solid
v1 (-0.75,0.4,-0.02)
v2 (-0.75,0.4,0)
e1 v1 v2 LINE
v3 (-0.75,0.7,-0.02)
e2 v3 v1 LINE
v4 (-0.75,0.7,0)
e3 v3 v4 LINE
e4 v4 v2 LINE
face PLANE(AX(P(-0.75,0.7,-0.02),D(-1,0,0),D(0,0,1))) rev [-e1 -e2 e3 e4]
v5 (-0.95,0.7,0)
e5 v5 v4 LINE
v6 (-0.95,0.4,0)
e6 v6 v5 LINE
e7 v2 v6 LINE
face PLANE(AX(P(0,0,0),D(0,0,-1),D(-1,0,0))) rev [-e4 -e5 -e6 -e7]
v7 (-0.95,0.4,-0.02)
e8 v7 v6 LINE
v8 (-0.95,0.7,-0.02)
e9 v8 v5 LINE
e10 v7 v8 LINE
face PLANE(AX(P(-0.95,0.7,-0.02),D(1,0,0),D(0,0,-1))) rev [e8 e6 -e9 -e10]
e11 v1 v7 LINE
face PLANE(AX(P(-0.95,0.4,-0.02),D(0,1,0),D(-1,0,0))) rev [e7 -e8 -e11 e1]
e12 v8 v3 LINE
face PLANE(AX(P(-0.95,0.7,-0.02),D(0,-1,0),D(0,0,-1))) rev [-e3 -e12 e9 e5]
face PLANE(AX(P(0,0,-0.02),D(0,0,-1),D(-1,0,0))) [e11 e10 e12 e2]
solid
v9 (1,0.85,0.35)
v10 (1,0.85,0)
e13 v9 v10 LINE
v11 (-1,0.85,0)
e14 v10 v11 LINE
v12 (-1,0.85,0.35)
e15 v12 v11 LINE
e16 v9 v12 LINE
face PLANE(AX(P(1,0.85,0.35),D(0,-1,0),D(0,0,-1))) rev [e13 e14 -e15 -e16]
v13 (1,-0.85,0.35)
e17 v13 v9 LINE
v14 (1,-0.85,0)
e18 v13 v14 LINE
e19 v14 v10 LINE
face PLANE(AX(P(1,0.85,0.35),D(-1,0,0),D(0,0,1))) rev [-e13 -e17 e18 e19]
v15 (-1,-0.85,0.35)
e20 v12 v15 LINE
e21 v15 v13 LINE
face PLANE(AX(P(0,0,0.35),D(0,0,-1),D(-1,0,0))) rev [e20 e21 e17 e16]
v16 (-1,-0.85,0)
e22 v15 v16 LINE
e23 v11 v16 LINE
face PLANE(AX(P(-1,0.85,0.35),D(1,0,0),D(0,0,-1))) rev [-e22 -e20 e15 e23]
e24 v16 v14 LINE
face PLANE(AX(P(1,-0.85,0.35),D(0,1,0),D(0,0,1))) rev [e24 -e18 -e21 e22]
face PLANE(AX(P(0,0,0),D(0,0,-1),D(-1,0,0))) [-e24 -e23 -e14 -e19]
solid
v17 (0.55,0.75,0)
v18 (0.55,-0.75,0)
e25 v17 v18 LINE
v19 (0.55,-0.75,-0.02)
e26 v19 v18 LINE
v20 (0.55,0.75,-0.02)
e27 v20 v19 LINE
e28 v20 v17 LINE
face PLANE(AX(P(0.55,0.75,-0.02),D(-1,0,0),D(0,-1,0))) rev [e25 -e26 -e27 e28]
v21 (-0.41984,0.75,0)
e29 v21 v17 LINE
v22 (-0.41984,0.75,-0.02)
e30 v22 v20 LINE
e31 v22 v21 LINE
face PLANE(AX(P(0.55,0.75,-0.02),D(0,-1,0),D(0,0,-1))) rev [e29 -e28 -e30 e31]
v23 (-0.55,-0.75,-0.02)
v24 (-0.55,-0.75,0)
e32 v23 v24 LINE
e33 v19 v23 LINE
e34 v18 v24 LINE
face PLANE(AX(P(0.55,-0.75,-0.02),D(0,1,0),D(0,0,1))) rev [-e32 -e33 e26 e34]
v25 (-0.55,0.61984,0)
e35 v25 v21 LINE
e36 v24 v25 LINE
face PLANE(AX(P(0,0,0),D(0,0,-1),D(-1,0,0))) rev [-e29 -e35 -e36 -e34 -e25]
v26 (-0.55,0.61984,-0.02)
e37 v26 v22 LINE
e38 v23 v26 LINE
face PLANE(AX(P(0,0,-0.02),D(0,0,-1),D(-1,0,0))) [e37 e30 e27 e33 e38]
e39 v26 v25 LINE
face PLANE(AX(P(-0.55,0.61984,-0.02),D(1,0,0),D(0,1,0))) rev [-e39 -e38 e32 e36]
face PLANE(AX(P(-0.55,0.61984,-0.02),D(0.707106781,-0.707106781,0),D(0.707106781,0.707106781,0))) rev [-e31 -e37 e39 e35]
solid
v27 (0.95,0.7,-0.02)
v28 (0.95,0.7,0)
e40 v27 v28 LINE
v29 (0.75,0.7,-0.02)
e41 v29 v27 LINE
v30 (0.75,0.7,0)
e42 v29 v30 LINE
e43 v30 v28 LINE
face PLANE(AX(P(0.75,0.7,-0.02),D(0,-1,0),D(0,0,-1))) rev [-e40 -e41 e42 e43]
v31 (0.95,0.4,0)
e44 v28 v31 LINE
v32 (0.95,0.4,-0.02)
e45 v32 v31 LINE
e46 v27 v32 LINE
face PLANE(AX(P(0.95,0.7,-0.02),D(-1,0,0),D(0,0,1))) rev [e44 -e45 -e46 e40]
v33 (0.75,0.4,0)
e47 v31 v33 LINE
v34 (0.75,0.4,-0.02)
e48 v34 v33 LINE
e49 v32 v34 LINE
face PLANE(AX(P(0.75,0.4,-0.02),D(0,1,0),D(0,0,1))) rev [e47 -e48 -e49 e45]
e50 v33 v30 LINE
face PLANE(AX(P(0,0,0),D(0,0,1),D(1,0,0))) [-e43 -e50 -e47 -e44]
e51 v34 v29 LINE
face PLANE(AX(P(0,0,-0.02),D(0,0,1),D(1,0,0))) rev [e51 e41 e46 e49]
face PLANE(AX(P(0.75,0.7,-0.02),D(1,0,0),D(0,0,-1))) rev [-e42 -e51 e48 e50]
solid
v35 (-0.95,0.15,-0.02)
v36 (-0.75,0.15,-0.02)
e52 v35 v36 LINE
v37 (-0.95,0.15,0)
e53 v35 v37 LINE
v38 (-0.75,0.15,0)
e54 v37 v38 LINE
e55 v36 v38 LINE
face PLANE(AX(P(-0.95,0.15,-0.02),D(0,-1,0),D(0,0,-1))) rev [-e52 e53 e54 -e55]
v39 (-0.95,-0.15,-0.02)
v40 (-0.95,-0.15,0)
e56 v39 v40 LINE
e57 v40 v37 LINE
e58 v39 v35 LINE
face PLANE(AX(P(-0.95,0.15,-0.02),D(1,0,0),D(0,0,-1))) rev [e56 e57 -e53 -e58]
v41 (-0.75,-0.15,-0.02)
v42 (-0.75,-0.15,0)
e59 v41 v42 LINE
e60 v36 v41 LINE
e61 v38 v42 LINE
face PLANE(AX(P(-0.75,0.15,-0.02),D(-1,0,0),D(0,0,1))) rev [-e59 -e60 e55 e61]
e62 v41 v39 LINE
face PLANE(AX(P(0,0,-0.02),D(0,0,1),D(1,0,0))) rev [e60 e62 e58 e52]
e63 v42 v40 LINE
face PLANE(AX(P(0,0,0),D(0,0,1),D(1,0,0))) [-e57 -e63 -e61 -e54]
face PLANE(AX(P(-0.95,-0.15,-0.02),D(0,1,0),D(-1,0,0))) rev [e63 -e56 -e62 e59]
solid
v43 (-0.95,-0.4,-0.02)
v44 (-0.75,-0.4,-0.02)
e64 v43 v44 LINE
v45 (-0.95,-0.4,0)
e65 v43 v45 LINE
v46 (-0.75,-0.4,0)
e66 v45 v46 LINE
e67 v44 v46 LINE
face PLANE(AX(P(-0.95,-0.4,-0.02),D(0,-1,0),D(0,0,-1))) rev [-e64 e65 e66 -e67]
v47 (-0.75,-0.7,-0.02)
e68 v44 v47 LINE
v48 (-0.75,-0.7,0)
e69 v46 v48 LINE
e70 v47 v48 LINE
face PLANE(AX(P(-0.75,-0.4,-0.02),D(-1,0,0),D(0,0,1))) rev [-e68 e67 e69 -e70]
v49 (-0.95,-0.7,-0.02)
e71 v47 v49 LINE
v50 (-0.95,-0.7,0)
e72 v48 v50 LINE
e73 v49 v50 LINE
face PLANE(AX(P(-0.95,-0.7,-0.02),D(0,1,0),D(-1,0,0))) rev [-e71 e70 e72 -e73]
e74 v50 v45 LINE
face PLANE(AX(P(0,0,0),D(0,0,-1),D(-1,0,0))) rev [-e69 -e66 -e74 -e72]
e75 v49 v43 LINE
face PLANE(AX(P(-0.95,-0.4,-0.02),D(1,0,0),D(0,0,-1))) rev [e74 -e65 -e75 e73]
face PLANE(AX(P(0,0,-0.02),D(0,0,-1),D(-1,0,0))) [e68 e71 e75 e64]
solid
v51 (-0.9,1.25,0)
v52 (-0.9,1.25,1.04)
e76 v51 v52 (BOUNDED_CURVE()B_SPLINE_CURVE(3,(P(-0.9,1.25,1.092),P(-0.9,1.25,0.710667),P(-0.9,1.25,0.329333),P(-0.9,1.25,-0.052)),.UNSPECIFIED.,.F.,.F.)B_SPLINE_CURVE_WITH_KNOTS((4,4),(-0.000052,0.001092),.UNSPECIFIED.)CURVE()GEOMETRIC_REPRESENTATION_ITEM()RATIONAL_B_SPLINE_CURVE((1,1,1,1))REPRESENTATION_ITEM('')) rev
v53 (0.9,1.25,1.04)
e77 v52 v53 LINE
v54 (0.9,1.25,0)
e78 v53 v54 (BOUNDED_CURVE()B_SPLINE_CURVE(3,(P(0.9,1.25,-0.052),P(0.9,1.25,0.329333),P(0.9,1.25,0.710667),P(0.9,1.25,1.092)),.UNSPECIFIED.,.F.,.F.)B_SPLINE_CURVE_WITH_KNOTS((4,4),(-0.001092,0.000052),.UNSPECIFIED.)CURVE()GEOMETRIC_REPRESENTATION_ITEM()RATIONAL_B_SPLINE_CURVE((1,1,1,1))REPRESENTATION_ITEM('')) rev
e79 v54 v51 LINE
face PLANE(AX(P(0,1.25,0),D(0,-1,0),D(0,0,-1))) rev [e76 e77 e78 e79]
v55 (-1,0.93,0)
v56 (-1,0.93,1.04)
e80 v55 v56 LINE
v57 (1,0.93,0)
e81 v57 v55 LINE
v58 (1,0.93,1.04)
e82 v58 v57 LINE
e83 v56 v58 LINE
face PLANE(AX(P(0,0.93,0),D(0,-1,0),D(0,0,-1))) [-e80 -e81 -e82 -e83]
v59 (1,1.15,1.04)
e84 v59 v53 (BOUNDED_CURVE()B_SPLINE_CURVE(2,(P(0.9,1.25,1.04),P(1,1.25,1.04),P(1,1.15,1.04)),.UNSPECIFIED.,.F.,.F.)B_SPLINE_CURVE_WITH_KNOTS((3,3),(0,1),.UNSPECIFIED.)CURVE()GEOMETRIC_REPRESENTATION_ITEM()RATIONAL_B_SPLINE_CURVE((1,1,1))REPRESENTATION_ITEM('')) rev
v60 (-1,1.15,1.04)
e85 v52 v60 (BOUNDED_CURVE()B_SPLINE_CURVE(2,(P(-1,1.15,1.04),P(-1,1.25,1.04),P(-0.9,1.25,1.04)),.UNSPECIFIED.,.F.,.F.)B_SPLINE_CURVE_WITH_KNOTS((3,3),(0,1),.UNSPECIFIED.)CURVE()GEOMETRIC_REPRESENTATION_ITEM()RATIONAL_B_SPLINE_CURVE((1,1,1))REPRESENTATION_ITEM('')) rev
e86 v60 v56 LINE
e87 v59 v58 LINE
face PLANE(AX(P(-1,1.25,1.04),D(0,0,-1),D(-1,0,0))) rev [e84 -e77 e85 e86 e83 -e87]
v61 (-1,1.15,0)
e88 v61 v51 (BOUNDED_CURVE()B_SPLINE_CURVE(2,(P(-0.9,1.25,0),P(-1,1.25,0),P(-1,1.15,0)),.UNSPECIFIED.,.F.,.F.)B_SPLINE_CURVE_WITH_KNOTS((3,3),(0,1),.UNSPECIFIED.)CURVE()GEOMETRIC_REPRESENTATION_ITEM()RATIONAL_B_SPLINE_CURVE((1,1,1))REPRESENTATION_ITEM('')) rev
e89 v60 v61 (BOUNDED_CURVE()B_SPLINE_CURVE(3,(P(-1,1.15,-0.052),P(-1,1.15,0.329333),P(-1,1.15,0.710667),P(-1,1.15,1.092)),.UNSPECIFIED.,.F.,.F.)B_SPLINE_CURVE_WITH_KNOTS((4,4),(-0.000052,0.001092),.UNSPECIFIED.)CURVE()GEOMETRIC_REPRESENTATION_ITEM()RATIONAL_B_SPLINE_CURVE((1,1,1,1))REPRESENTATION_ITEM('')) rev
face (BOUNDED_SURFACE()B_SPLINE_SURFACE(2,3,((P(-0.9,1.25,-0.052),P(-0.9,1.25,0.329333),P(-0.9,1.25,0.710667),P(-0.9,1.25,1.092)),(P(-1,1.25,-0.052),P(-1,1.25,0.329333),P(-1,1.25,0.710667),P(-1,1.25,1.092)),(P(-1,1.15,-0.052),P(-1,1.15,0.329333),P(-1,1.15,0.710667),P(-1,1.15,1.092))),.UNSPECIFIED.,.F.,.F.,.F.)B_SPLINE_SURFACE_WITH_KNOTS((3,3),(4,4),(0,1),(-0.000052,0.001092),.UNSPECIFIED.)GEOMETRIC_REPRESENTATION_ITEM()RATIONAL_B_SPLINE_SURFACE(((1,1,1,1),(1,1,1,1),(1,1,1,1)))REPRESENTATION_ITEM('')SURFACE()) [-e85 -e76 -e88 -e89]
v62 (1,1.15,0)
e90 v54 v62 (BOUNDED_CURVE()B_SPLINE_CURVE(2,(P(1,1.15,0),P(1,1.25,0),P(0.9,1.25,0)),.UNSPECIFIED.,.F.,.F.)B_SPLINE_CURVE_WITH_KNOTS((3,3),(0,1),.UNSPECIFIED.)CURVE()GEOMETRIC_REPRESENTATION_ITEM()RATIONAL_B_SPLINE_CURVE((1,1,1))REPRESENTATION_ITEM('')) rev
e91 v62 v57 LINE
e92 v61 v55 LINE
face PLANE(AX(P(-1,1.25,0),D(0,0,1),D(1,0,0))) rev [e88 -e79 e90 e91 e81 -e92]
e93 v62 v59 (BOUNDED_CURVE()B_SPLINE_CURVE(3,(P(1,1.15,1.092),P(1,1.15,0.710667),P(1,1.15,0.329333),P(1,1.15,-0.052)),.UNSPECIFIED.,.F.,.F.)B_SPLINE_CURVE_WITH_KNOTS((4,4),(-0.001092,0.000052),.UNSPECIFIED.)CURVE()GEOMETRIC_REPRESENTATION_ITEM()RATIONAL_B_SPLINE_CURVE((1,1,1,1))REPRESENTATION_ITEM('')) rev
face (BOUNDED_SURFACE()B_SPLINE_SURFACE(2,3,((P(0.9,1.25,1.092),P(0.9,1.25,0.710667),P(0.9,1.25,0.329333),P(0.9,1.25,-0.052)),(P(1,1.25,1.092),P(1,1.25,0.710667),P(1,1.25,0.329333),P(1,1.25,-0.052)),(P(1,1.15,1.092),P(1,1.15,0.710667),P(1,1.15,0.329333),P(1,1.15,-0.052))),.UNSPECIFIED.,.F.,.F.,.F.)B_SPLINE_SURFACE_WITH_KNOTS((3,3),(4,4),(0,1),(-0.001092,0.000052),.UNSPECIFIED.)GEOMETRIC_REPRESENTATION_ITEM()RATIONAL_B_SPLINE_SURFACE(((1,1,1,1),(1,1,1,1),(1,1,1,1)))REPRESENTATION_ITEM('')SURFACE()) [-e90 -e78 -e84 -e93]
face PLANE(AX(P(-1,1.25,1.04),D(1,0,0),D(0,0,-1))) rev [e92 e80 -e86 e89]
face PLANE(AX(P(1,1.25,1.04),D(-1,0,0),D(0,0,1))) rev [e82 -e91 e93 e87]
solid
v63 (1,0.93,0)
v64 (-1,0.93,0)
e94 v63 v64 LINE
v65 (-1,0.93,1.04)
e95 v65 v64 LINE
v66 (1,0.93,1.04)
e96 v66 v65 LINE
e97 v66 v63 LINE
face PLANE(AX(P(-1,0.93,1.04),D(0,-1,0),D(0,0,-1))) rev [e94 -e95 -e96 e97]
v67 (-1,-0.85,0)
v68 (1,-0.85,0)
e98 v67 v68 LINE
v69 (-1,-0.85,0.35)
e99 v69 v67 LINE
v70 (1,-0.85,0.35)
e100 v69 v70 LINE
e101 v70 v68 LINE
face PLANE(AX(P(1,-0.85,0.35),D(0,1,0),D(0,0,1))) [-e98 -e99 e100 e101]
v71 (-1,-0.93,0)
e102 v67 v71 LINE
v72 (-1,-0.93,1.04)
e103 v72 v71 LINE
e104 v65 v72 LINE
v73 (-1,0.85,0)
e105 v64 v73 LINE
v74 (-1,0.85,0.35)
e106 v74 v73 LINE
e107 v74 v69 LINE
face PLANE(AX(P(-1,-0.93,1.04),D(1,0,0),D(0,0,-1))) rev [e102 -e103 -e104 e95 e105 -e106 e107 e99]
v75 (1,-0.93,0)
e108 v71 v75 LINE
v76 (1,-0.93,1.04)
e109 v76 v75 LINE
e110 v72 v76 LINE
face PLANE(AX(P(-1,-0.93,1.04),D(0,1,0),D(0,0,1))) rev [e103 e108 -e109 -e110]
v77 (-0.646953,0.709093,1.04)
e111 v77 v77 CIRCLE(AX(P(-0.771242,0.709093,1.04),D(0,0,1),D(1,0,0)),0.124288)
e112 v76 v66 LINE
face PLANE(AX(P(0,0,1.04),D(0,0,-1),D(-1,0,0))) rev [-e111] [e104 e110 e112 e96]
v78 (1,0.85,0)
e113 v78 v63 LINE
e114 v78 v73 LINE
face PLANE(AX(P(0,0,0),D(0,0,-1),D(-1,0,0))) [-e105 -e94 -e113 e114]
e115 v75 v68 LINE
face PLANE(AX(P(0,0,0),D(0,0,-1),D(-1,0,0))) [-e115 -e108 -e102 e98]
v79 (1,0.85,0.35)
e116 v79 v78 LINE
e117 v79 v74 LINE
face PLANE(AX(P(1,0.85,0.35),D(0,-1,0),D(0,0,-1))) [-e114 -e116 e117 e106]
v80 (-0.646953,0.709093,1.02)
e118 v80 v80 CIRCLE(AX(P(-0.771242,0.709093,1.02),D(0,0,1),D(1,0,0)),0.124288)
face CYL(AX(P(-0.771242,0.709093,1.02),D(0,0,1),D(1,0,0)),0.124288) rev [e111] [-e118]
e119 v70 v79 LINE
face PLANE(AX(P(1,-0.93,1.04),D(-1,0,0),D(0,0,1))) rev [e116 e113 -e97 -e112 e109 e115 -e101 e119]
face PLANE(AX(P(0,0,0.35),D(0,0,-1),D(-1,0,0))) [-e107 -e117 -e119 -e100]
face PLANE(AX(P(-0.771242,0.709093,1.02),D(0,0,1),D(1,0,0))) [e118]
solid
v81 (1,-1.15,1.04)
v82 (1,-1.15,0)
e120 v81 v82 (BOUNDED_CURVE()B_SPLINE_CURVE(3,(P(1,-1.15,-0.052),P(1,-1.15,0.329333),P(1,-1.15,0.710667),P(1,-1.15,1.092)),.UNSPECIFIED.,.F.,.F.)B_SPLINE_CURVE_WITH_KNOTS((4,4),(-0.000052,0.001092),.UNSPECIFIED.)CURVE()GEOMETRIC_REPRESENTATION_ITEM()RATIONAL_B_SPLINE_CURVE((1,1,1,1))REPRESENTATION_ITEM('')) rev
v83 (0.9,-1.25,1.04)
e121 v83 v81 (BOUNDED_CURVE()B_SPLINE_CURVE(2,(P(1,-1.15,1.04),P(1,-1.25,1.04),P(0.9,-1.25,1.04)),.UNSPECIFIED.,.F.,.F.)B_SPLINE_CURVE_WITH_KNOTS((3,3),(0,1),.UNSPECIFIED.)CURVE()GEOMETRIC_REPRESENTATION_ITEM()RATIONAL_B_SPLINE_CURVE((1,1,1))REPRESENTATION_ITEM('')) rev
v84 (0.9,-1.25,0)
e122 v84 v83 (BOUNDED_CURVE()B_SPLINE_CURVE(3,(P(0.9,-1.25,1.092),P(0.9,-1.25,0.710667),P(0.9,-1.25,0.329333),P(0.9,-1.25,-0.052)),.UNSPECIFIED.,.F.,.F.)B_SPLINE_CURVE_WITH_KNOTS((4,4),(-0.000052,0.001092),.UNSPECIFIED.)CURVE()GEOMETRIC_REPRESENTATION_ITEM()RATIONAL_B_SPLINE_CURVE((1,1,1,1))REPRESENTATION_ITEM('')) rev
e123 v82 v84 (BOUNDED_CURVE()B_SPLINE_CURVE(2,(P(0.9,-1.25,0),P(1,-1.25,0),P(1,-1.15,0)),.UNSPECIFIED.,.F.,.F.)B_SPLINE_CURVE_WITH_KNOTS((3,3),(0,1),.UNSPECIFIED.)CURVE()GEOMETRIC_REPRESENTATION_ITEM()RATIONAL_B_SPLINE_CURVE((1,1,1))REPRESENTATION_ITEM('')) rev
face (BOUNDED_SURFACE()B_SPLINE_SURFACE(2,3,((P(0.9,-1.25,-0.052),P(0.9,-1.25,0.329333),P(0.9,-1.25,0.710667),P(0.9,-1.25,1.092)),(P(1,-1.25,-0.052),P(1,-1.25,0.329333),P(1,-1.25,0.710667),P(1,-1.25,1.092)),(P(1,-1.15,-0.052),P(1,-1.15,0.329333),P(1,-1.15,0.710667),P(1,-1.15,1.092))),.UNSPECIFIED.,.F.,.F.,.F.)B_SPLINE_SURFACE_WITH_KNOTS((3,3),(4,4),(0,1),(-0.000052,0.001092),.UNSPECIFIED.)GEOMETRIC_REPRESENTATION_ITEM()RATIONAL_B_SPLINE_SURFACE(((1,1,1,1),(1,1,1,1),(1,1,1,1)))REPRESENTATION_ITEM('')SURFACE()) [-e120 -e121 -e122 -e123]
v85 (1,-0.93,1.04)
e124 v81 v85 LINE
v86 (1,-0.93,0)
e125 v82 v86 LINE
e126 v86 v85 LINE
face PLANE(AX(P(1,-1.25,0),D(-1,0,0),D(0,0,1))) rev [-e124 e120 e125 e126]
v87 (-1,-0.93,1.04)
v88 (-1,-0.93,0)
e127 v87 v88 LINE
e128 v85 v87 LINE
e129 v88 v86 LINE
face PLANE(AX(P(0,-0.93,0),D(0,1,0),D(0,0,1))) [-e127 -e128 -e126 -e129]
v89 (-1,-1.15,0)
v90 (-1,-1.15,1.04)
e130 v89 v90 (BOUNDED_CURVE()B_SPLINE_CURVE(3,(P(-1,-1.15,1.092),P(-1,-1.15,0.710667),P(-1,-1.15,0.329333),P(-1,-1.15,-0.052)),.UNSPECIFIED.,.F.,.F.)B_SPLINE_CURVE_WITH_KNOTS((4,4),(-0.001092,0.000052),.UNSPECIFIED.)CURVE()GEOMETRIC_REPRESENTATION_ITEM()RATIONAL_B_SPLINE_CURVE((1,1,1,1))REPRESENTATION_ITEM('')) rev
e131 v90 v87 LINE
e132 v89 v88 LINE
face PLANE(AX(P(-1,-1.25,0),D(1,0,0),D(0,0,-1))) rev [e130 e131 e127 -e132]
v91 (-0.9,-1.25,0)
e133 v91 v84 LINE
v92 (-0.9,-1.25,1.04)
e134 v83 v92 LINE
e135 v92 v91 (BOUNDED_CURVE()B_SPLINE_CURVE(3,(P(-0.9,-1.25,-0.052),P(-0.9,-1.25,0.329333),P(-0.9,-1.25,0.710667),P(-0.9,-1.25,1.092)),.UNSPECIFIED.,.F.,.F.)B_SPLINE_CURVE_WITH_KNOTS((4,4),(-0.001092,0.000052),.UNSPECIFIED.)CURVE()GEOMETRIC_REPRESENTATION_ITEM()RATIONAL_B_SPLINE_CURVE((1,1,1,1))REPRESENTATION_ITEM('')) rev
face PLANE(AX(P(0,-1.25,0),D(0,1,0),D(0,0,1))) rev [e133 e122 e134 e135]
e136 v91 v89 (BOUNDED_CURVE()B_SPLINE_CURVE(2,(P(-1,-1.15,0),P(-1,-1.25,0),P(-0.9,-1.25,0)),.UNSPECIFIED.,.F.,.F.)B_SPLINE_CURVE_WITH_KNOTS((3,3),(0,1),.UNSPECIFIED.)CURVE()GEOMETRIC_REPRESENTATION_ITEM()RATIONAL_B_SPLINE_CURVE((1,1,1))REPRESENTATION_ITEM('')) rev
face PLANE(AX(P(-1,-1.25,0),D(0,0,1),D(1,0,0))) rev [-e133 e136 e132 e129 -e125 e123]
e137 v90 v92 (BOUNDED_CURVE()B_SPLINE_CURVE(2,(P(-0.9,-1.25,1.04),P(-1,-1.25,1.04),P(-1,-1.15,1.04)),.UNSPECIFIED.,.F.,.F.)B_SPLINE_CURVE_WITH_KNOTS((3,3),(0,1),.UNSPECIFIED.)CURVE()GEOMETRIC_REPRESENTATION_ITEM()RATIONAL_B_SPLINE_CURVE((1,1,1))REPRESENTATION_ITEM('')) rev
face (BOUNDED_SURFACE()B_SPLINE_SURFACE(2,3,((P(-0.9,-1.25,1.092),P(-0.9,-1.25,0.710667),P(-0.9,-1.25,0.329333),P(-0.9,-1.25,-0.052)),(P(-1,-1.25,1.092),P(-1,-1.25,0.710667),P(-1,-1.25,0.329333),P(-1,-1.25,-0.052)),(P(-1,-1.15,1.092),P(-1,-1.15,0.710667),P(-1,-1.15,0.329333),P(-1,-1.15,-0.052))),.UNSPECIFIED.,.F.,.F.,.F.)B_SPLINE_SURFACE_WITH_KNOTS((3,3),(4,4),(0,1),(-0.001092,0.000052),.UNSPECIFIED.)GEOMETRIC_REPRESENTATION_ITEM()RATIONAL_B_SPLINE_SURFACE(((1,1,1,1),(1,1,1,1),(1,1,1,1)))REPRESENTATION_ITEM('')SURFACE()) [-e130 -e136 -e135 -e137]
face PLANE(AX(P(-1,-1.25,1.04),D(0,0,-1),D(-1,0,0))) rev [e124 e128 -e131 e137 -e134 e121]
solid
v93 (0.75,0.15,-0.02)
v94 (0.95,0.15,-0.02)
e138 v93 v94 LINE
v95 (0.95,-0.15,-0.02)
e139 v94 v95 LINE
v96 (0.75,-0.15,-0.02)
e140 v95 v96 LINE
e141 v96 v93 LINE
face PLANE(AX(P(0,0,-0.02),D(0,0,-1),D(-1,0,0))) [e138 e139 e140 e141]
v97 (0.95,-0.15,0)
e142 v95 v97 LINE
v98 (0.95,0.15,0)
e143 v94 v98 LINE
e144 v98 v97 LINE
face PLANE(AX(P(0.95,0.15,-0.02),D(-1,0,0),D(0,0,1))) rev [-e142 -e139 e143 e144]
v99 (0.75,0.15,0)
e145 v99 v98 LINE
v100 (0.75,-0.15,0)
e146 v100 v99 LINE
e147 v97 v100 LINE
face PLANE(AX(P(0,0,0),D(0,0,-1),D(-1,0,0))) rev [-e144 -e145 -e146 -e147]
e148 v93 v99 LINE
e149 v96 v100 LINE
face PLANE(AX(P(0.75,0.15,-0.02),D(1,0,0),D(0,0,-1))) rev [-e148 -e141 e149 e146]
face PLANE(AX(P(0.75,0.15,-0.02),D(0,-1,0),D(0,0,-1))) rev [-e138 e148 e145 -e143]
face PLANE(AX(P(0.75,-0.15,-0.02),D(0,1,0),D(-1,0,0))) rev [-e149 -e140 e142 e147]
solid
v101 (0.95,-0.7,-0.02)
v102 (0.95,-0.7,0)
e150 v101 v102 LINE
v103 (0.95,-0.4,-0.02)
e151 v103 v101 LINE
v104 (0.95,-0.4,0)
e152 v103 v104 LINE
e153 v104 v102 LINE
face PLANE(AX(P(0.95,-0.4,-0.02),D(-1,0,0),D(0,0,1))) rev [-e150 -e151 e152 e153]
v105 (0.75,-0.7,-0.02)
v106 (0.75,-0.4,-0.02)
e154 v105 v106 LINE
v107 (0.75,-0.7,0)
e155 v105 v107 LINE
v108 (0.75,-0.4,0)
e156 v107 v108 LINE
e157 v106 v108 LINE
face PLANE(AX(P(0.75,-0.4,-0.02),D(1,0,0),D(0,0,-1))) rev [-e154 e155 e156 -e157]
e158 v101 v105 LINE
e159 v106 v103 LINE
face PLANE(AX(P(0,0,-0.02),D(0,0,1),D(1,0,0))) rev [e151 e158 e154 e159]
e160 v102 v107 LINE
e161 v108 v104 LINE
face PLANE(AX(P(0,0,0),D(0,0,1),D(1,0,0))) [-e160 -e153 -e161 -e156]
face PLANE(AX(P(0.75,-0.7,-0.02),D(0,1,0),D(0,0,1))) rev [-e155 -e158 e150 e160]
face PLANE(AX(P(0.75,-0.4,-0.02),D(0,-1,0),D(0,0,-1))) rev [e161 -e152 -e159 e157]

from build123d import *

# Parameters (mm, degrees)
SKETCH1_W             = 2
SKETCH1_H             = 1.86
BOSS_EXTRUDE1_DEPTH   = 1.04
SKETCH8_W             = 2
SKETCH8_H             = 1.04
BOSS_EXTRUDE3_DEPTH   = 0.32
SKETCH10_W            = 2
SKETCH10_H            = 1.04
BOSS_EXTRUDE4_DEPTH   = 0.32
FILLET1_SIZE          = 0.1
FILLET2_SIZE          = 0.1
SKETCH11_W            = 2
SKETCH11_H            = 1.7
CUT_EXTRUDE1_DEPTH    = 0.35
SKETCH11_2_W          = 2
SKETCH11_2_H          = 1.7
BOSS_EXTRUDE5_DEPTH   = 0.35
SKETCH13_W            = 0.2
SKETCH13_H            = 0.3
BOSS_EXTRUDE6_DEPTH   = 0.02
BOSS_EXTRUDE6_2_DEPTH = 0.02
BOSS_EXTRUDE6_3_DEPTH = 0.02
BOSS_EXTRUDE6_4_DEPTH = 0.02
BOSS_EXTRUDE6_5_DEPTH = 0.02
BOSS_EXTRUDE6_6_DEPTH = 0.02
BOSS_EXTRUDE6_7_DEPTH = 0.02
SKETCH14_R            = 0.124288499
CUT_EXTRUDE2_DEPTH    = 0.02


with BuildPart() as part:
    # Sketch1 → Boss-Extrude1 (new body)
    with BuildSketch(Plane.XY):
        Rectangle(SKETCH1_W, SKETCH1_H)
    extrude(amount=BOSS_EXTRUDE1_DEPTH)

    # Sketch11 → Cut-Extrude1 (cut)
    with BuildSketch(Plane.XY):
        Rectangle(SKETCH11_W, SKETCH11_H)
    extrude(amount=CUT_EXTRUDE1_DEPTH, mode=Mode.SUBTRACT)

    # Sketch14 → Cut-Extrude2 (cut)
    with BuildSketch(Plane.XY.offset(1.04)):
        with Locations((-0.771241568, 0.709092923)):
            Circle(SKETCH14_R)
    extrude(amount=-CUT_EXTRUDE2_DEPTH, mode=Mode.SUBTRACT)


with BuildPart() as body_2:
    # Sketch8 → Boss-Extrude3 (new body)
    with BuildSketch(Plane(origin=(0, 0.93, 0), x_dir=(1, 0, 0), z_dir=(0, 1, 0))):
        with Locations((0, -0.52)):
            Rectangle(SKETCH8_W, SKETCH8_H)
    extrude(amount=BOSS_EXTRUDE3_DEPTH)

    # Fillet1
    # a fillet whose section is not a circle: 0.1 mm, written as the material it takes off along each edge
    with BuildSketch(Plane(origin=(1, 1.25, 1.29), x_dir=(0, -1, 0), z_dir=(0, 0, -1)), Plane(origin=(-1, 1.25, -0.25), x_dir=(0, -1, 0), z_dir=(0, 0, 1))) as fillet1_piece_1:
        with BuildLine():
            Bezier((FILLET1_SIZE, 0), (0, 0), (0, FILLET1_SIZE), weights=[1, 1, 1])
            Line((0, FILLET1_SIZE), (0, 0))
            Line((0, 0), (FILLET1_SIZE, 0))
        make_face()
    extrude(amount=1.54, mode=Mode.SUBTRACT)


with BuildPart() as body_3:
    # Sketch10 → Boss-Extrude4 (new body)
    with BuildSketch(Plane(origin=(0, -0.93, 0), x_dir=(-1, 0, 0), z_dir=(0, -1, 0))):
        with Locations((0, -0.52)):
            Rectangle(SKETCH10_W, SKETCH10_H)
    extrude(amount=BOSS_EXTRUDE4_DEPTH)

    # Fillet2
    # a fillet whose section is not a circle: 0.1 mm, written as the material it takes off along each edge
    with BuildSketch(Plane(origin=(1, -1.25, -0.25), x_dir=(0, 1, 0), z_dir=(0, 0, 1)), Plane(origin=(-1, -1.25, 1.29), x_dir=(0, 1, 0), z_dir=(0, 0, -1))) as fillet2_piece_1:
        with BuildLine():
            Bezier((FILLET2_SIZE, 0), (0, 0), (0, FILLET2_SIZE), weights=[1, 1, 1])
            Line((0, FILLET2_SIZE), (0, 0))
            Line((0, 0), (FILLET2_SIZE, 0))
        make_face()
    extrude(amount=1.54, mode=Mode.SUBTRACT)


with BuildPart() as body_4:
    # Sketch11<2> → Boss-Extrude5 (new body)
    with BuildSketch(Plane.XY):
        Rectangle(SKETCH11_2_W, SKETCH11_2_H)
    extrude(amount=BOSS_EXTRUDE5_DEPTH)


with BuildPart() as body_5:
    # Sketch13 → Boss-Extrude6 (new body)
    with BuildSketch(Plane(origin=(0, 0, 0), x_dir=(-1, 0, 0), z_dir=(0, 0, -1))):
        with Locations((-0.85, 0)):
            Rectangle(SKETCH13_W, SKETCH13_H)
    extrude(amount=BOSS_EXTRUDE6_DEPTH)


with BuildPart() as body_6:
    # Sketch13 → Boss-Extrude6 2 (new body)
    with BuildSketch(Plane(origin=(0, 0, 0), x_dir=(-1, 0, 0), z_dir=(0, 0, -1))):
        Polygon((-0.55, 0.75), (0.419840261, 0.75), (0.55, 0.619840261), (0.55, -0.75), (-0.55, -0.75), align=None)
    extrude(amount=BOSS_EXTRUDE6_2_DEPTH)


with BuildPart() as body_7:
    # Sketch13 → Boss-Extrude6 3 (new body)
    with BuildSketch(Plane(origin=(0, 0, 0), x_dir=(-1, 0, 0), z_dir=(0, 0, -1))):
        with Locations((0.85, 0)):
            Rectangle(SKETCH13_W, SKETCH13_H)
    extrude(amount=BOSS_EXTRUDE6_3_DEPTH)


with BuildPart() as body_8:
    # Sketch13 → Boss-Extrude6 4 (new body)
    with BuildSketch(Plane(origin=(0, 0, 0), x_dir=(-1, 0, 0), z_dir=(0, 0, -1))):
        with Locations((0.85, 0.55)):
            Rectangle(SKETCH13_W, SKETCH13_H)
    extrude(amount=BOSS_EXTRUDE6_4_DEPTH)


with BuildPart() as body_9:
    # Sketch13 → Boss-Extrude6 5 (new body)
    with BuildSketch(Plane(origin=(0, 0, 0), x_dir=(-1, 0, 0), z_dir=(0, 0, -1))):
        with Locations((-0.85, 0.55)):
            Rectangle(SKETCH13_W, SKETCH13_H)
    extrude(amount=BOSS_EXTRUDE6_5_DEPTH)


with BuildPart() as body_10:
    # Sketch13 → Boss-Extrude6 6 (new body)
    with BuildSketch(Plane(origin=(0, 0, 0), x_dir=(-1, 0, 0), z_dir=(0, 0, -1))):
        with Locations((0.85, -0.55)):
            Rectangle(SKETCH13_W, SKETCH13_H)
    extrude(amount=BOSS_EXTRUDE6_6_DEPTH)


with BuildPart() as body_11:
    # Sketch13 → Boss-Extrude6 7 (new body)
    with BuildSketch(Plane(origin=(0, 0, 0), x_dir=(-1, 0, 0), z_dir=(0, 0, -1))):
        with Locations((-0.85, -0.55)):
            Rectangle(SKETCH13_W, SKETCH13_H)
    extrude(amount=BOSS_EXTRUDE6_7_DEPTH)


solid = Compound([part.part, body_2.part, body_3.part, body_4.part, body_5.part, body_6.part, body_7.part, body_8.part, body_9.part, body_10.part, body_11.part])
